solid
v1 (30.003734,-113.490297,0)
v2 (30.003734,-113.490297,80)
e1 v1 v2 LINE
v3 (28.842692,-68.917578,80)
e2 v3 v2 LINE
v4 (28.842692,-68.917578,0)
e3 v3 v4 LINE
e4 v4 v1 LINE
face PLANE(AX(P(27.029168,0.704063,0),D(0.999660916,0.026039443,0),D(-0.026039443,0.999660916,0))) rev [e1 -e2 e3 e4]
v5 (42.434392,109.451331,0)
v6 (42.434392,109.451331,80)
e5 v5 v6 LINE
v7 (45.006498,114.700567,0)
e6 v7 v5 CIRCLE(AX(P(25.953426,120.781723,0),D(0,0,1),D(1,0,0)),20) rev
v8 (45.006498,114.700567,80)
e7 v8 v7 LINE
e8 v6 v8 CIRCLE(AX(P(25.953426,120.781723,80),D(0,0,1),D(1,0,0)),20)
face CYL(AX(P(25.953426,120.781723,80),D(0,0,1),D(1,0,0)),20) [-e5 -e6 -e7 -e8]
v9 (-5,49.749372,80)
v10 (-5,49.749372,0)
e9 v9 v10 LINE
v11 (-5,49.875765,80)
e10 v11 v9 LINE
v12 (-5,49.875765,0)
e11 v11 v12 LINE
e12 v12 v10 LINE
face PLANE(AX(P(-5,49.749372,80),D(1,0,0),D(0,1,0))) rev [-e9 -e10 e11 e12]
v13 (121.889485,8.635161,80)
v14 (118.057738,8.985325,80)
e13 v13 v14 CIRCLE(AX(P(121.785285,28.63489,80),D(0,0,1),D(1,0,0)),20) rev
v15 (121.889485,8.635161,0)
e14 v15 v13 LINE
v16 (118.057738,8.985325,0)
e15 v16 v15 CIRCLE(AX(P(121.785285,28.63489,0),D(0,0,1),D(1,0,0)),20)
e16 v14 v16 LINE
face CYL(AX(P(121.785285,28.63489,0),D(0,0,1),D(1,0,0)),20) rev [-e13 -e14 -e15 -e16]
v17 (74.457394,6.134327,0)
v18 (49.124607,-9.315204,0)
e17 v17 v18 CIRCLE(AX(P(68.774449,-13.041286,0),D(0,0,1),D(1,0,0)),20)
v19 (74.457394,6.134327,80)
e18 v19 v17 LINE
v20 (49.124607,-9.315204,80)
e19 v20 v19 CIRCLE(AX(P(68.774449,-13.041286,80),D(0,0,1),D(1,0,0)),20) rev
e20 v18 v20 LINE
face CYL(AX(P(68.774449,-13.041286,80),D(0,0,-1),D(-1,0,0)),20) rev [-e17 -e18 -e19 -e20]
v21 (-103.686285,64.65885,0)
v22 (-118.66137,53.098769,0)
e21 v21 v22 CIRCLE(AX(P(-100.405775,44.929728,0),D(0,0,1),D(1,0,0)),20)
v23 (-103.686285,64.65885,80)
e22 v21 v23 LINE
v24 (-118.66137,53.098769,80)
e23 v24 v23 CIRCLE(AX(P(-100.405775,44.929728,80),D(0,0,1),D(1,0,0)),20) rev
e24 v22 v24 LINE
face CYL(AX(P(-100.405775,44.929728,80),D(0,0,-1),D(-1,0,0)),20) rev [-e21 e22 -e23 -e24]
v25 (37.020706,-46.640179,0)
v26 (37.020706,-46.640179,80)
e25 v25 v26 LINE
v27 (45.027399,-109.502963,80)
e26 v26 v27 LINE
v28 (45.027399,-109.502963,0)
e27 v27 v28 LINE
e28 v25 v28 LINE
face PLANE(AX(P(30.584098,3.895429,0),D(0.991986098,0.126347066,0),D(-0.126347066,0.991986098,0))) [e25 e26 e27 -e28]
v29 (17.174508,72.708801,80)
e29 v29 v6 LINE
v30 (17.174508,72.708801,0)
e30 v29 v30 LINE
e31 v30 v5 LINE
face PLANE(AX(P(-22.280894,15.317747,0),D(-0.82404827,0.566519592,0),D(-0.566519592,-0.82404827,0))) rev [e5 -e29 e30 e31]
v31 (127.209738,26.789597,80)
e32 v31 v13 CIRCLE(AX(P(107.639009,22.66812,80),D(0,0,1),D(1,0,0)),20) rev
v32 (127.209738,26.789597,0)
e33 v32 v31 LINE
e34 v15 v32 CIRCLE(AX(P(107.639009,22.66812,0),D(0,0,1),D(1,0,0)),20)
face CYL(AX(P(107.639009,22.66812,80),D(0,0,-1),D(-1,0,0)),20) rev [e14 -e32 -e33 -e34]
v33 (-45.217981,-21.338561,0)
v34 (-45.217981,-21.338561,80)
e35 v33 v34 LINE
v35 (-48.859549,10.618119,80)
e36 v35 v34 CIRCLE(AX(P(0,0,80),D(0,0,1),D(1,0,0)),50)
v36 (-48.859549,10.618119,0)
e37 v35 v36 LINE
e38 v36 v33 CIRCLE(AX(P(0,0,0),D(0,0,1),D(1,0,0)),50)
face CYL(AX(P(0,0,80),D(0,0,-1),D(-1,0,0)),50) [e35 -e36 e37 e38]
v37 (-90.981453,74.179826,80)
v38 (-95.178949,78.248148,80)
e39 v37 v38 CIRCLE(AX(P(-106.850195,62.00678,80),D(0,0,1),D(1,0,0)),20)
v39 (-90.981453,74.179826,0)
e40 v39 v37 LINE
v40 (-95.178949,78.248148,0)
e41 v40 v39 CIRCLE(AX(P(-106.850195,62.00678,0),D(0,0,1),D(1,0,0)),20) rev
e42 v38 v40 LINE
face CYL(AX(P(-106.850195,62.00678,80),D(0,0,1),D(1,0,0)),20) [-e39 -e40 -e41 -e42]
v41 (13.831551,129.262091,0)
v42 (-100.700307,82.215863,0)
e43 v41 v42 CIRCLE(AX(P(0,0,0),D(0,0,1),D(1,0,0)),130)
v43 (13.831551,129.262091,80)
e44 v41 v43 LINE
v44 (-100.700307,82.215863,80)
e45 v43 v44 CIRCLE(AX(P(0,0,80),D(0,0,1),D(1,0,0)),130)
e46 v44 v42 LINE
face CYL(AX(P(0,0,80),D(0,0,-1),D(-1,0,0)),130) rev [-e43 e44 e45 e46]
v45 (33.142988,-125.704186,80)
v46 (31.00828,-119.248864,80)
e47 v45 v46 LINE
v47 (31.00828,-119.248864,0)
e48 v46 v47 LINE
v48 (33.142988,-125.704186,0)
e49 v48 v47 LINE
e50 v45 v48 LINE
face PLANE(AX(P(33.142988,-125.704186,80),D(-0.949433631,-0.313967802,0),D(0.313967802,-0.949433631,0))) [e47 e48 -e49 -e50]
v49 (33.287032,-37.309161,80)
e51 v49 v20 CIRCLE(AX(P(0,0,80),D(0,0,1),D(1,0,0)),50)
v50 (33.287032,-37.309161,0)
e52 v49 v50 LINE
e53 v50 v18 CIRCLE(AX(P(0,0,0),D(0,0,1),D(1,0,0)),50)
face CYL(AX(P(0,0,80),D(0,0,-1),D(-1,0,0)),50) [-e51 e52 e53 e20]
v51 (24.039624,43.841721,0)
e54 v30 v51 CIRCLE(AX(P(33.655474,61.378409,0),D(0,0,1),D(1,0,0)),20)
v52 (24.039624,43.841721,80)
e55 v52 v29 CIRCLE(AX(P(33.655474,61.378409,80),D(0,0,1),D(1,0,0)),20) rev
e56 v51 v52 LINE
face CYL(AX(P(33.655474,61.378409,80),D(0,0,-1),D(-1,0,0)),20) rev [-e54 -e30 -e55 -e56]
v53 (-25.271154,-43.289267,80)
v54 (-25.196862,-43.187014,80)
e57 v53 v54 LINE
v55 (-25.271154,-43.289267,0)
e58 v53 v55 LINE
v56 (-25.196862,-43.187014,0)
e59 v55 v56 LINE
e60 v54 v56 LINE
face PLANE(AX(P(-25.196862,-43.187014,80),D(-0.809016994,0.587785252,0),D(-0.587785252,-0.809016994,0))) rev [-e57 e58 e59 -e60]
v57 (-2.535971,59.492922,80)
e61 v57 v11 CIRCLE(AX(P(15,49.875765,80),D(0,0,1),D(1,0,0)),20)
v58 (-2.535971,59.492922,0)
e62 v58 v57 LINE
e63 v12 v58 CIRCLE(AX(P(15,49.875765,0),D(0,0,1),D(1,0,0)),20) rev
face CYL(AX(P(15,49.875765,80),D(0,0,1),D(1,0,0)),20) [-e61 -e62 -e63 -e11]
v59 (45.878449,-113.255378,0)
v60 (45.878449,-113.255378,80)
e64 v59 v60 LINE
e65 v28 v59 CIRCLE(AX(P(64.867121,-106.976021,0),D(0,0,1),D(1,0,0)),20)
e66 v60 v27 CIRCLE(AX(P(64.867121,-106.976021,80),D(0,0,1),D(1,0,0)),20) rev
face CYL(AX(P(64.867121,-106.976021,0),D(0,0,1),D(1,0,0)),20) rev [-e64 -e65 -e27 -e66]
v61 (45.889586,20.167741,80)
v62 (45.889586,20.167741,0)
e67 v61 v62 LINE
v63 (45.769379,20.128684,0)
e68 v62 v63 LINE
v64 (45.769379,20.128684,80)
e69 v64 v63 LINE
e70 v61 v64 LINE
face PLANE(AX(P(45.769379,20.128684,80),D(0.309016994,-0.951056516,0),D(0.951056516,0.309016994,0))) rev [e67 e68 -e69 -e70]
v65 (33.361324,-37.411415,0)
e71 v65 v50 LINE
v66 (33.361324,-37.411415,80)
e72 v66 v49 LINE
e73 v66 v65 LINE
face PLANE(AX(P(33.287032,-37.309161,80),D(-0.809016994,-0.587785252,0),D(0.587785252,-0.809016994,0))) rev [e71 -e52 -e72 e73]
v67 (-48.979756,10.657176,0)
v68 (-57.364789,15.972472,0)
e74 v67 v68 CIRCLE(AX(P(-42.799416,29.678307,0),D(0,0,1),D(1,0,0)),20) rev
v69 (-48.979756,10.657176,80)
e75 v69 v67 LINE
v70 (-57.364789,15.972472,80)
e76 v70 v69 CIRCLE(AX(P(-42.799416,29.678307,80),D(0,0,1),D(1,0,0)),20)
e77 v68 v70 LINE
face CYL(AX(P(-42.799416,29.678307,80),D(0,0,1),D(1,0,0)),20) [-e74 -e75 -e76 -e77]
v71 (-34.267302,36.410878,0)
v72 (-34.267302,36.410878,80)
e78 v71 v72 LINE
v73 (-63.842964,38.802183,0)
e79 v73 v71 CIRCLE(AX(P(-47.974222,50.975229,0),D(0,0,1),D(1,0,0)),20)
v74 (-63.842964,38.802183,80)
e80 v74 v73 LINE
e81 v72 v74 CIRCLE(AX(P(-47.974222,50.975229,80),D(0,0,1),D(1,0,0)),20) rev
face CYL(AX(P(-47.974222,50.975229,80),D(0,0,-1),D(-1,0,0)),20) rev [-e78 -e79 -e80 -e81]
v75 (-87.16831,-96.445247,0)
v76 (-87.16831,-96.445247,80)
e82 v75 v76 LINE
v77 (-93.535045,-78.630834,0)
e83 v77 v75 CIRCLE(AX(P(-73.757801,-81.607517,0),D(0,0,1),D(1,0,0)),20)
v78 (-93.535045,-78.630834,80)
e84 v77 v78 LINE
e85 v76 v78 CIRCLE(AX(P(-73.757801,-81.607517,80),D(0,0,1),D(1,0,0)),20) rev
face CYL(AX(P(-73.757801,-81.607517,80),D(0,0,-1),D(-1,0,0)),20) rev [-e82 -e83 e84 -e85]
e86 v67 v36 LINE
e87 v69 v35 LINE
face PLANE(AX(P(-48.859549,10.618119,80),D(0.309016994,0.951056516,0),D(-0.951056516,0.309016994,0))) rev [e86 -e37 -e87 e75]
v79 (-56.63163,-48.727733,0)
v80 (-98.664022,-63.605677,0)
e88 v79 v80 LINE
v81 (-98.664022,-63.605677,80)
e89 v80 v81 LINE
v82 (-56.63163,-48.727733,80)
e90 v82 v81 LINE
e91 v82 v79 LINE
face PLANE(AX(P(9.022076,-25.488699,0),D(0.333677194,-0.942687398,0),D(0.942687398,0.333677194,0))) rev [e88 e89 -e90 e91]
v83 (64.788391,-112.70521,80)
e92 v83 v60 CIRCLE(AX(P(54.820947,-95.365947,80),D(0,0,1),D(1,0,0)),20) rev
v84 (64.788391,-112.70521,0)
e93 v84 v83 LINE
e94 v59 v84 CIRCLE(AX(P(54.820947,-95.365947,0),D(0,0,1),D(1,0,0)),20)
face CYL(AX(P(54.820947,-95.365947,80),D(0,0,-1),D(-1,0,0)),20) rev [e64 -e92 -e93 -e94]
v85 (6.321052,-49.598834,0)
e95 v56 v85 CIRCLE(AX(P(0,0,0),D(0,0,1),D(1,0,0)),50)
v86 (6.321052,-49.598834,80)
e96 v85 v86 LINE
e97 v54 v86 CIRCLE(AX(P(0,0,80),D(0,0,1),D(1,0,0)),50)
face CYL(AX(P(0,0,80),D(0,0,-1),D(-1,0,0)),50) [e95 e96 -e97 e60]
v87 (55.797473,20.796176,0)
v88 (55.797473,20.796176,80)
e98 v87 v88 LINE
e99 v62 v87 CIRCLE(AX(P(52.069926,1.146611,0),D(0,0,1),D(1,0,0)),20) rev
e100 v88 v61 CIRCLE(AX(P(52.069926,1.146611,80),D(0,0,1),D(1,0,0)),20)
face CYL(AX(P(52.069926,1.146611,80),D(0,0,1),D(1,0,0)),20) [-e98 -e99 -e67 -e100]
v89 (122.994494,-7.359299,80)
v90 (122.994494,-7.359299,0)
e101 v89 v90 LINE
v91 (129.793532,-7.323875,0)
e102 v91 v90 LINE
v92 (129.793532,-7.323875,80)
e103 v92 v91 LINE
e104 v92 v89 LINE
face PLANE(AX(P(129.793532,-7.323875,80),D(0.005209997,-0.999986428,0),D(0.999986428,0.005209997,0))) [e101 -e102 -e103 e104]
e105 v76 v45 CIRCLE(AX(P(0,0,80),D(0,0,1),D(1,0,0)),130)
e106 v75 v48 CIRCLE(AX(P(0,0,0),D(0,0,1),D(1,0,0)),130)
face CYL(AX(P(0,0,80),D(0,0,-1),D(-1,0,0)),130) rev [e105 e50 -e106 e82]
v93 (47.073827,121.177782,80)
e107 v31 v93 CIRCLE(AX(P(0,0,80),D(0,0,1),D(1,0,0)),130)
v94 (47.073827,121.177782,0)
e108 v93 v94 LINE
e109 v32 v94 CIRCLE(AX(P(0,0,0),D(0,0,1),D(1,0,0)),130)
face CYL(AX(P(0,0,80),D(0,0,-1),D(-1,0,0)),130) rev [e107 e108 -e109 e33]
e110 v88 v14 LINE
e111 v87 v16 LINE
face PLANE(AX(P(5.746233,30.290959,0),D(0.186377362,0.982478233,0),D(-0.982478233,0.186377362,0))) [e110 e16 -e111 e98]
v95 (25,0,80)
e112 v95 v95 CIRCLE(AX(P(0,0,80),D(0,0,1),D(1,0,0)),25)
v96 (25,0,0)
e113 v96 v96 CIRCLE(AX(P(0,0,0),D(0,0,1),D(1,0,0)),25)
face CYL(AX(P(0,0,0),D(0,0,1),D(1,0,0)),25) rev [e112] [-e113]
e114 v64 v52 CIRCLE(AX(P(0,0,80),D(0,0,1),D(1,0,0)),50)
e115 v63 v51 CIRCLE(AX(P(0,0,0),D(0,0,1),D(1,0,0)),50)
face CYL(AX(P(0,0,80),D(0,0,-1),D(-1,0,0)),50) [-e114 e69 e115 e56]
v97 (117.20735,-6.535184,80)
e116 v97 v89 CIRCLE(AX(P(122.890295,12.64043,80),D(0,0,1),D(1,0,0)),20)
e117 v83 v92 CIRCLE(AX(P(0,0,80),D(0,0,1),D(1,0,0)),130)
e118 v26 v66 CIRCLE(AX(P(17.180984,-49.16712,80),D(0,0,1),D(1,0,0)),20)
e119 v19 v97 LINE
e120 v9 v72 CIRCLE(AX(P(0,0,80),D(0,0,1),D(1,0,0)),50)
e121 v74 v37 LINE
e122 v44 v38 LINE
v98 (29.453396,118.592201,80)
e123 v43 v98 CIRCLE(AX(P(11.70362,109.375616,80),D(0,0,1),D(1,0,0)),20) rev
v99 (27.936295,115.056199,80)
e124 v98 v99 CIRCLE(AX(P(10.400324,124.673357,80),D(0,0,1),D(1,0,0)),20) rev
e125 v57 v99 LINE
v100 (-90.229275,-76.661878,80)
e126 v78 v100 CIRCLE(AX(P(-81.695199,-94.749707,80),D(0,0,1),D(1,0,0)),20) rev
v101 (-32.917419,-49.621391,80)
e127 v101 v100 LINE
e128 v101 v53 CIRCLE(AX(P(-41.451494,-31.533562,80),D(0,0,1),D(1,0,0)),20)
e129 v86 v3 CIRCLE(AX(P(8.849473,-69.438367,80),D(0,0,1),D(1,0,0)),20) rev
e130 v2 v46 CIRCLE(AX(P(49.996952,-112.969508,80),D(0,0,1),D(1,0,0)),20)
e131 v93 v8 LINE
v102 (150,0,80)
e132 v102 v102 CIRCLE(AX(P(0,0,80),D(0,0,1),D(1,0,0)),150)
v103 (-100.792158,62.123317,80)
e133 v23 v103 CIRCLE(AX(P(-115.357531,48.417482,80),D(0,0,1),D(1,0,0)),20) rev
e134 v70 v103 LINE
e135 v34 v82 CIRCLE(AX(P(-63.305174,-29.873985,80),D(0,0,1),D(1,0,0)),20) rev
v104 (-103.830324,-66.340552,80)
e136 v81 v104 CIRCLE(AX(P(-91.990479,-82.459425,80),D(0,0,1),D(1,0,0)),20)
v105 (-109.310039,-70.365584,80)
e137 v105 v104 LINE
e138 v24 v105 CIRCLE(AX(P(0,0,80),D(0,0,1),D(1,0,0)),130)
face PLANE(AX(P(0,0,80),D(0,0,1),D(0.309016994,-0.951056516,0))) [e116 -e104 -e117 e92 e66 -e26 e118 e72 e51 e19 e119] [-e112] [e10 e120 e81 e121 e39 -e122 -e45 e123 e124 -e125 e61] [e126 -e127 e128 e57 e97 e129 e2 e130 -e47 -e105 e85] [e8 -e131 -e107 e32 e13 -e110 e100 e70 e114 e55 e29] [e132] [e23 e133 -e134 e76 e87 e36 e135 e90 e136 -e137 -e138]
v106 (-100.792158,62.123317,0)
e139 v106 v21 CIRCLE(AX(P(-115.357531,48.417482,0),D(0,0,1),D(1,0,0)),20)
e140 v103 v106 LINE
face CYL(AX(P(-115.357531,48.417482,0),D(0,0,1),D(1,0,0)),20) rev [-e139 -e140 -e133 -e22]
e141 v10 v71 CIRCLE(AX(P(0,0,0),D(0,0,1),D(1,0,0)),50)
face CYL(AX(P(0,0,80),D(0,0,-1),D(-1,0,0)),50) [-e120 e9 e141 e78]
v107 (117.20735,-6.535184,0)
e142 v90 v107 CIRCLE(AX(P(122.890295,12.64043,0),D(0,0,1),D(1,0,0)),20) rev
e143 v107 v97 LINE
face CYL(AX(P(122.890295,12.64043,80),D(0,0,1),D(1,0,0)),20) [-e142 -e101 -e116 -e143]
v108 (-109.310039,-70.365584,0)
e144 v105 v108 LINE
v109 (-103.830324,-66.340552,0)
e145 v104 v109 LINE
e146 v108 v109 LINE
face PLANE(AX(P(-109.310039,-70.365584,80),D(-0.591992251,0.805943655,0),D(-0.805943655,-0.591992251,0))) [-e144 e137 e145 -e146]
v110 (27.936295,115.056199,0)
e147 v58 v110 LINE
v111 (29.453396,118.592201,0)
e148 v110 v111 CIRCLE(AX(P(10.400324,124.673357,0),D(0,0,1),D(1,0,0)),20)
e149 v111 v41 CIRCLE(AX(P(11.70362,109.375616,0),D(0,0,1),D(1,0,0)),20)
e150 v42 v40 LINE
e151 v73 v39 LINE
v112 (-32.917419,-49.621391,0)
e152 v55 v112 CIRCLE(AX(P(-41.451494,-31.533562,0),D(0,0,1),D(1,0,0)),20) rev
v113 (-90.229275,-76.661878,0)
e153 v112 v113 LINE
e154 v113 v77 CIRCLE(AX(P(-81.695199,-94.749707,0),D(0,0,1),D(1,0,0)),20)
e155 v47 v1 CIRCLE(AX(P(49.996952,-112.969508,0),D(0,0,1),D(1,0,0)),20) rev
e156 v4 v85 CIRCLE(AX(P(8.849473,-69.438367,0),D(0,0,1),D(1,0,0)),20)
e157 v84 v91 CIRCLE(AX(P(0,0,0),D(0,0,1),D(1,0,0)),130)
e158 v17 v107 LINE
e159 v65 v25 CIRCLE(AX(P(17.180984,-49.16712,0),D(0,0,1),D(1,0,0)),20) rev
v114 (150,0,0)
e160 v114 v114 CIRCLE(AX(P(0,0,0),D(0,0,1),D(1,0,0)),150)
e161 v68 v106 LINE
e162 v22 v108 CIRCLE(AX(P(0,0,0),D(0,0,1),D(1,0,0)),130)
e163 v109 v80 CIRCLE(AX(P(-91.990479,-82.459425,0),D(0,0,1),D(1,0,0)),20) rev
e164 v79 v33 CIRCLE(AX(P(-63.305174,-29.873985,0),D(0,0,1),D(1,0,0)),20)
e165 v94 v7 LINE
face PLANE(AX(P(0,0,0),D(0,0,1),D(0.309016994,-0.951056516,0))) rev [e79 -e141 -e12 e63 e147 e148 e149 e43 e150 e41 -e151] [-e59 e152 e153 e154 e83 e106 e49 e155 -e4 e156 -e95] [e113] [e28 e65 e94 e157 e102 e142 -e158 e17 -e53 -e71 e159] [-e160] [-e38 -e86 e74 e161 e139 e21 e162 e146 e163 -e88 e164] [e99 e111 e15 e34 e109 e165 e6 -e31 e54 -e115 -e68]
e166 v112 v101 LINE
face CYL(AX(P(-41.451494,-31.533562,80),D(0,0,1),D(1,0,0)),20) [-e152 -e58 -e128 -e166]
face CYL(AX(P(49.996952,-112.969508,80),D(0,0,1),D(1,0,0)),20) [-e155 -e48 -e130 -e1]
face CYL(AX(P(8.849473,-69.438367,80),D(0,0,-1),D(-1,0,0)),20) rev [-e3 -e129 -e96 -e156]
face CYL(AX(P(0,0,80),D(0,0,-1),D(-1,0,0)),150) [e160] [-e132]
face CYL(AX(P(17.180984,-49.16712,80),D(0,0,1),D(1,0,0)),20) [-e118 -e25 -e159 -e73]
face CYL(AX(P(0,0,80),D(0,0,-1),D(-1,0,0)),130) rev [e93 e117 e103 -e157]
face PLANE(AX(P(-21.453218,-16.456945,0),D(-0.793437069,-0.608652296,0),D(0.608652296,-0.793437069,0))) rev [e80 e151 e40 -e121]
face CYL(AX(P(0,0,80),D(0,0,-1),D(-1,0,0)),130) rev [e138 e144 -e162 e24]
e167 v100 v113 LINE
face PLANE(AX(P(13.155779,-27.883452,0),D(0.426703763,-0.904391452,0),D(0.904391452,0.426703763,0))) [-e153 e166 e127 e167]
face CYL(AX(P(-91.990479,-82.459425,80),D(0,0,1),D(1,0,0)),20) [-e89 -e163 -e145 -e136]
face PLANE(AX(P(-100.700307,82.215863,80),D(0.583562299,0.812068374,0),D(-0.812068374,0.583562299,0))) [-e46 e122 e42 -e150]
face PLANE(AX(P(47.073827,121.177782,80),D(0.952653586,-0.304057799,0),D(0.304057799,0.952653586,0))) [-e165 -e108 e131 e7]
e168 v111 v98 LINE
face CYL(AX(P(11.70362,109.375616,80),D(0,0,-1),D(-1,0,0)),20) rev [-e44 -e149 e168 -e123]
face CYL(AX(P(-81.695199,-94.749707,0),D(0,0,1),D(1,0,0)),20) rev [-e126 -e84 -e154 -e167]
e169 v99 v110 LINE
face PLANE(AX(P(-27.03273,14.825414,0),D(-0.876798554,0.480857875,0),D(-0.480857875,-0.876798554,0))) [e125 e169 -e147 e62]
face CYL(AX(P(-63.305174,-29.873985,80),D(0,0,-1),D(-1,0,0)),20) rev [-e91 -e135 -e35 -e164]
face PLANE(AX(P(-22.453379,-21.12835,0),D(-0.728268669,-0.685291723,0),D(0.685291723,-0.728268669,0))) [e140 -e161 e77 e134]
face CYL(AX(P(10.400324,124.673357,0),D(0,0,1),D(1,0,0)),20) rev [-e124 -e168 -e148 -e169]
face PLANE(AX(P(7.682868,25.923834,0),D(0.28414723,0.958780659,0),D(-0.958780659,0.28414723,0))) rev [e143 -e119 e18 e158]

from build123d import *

# Parameters (mm, degrees)
SKETCH1_R           = 150
BOSS_EXTRUDE1_DEPTH = 80
BOSS_EXTRUDE2_DEPTH = 80
LOFT1_DEPTH         = 80
CIRPATTERN1_COUNT   = 5
FILLET1_R           = 20
FILLET2_R           = 20
FILLET3_R           = 20
SKETCH3_R           = 25
CUT_EXTRUDE1_DEPTH  = 80


with BuildPart() as part:
    # Sketch1 → Boss-Extrude1 (new body)
    with BuildSketch(Plane.XY):
        Circle(SKETCH1_R)
        with BuildLine():
            Line((129.710171657, 8.675907367), (119.956691368, 8.625091073))
            Line((119.956691368, 8.625091073), (120.040051321, -7.374691773))
            Line((120.040051321, -7.374691773), (129.793531611, -7.323875479))
            ThreePointArc((129.793531611, -7.323875479), (105.568888587, -75.86309882), (48.333925621, -120.680701166))
            Line((48.333925621, -120.680701166), (45.271605291, -111.420293279))
            Line((45.271605291, -111.420293279), (30.080667198, -116.443778112))
            Line((30.080667198, -116.443778112), (33.142987529, -125.704185999))
            ThreePointArc((33.142987529, -125.704185999), (-39.527513828, -123.84496619), (-99.838162814, -83.260682474))
            Line((-99.838162814, -83.260682474), (-91.977300573, -77.486619356))
            Line((-91.977300573, -77.486619356), (-101.449176589, -64.591520879))
            Line((-101.449176589, -64.591520879), (-109.310038829, -70.365583996))
            ThreePointArc((-109.310038829, -70.365583996), (-129.998235624, -0.677299621), (-110.037303615, 69.222769471))
            Line((-110.037303615, 69.222769471), (-102.116703238, 63.530928844))
            Line((-102.116703238, 63.530928844), (-92.779706461, 76.524022824))
            Line((-92.779706461, 76.524022824), (-100.700306837, 82.215863451))
            ThreePointArc((-100.700306837, 82.215863451), (-40.815814265, 123.426372003), (31.831369149, 126.042706802))
            Line((31.831369149, 126.042706802), (28.865707153, 116.750892719))
            Line((28.865707153, 116.750892719), (44.10816453, 111.88596794))
            Line((44.10816453, 111.88596794), (47.073826527, 121.177782024))
            ThreePointArc((47.073826527, 121.177782024), (104.772675129, 76.958992627), (129.710171657, 8.675907367))
        make_face(mode=Mode.SUBTRACT)
    extrude(amount=BOSS_EXTRUDE1_DEPTH)


with BuildPart() as body_2:
    # Sketch2 → Boss-Extrude2 (new body)
    with BuildSketch(Plane.XY):
        with BuildLine():
            Line((-5, 55), (5, 55))
            Line((5, 55), (5, 49.749371855))
            ThreePointArc((5, 49.749371855), (29.389262615, 40.450849719), (45.769379313, 20.128683944))
            Line((45.769379313, 20.128683944), (50.763023424, 21.751217272))
            Line((50.763023424, 21.751217272), (53.853193368, 12.240652109))
            Line((53.853193368, 12.240652109), (48.859549256, 10.618118781))
            ThreePointArc((48.859549256, 10.618118781), (47.552825815, -15.450849719), (33.287032059, -37.309161029))
            Line((33.287032059, -37.309161029), (36.373273848, -41.557008429))
            Line((36.373273848, -41.557008429), (28.283103904, -47.434860952))
            Line((28.283103904, -47.434860952), (25.196862116, -43.187013552))
            ThreePointArc((25.196862116, -43.187013552), (0, -50), (-25.196862116, -43.187013552))
            Line((-25.196862116, -43.187013552), (-28.283103904, -47.434860952))
            Line((-28.283103904, -47.434860952), (-36.373273848, -41.557008429))
            Line((-36.373273848, -41.557008429), (-33.287032059, -37.309161029))
            ThreePointArc((-33.287032059, -37.309161029), (-47.552825815, -15.450849719), (-48.859549256, 10.618118781))
            Line((-48.859549256, 10.618118781), (-53.853193368, 12.240652109))
            Line((-53.853193368, 12.240652109), (-50.763023424, 21.751217272))
            Line((-50.763023424, 21.751217272), (-45.769379313, 20.128683944))
            ThreePointArc((-45.769379313, 20.128683944), (-29.389262615, 40.450849719), (-5, 49.749371855))
            Line((-5, 49.749371855), (-5, 55))
        make_face()
    extrude(amount=BOSS_EXTRUDE2_DEPTH)


with BuildPart() as body_3:
    # Loft1: read off the stored shape, not the designer's step
    # Loft1 outline → Loft1 (new body)
    with BuildSketch(Plane.XY):
        Polygon((44.10816453, 111.88596794), (28.865707153, 116.750892719), (-5, 55), (5, 55), align=None)
    extrude(amount=LOFT1_DEPTH)


with BuildPart() as cirpattern1_1:
    # CirPattern1: pattern copy
    add(body_3.part.rotate(Axis((0, 0, 0), (0, 0, 1)), 1 * 360 / CIRPATTERN1_COUNT))


with BuildPart() as cirpattern1_2:
    # CirPattern1: pattern copy
    add(body_3.part.rotate(Axis((0, 0, 0), (0, 0, 1)), 2 * 360 / CIRPATTERN1_COUNT))


with BuildPart() as cirpattern1_3:
    # CirPattern1: pattern copy
    add(body_3.part.rotate(Axis((0, 0, 0), (0, 0, 1)), 3 * 360 / CIRPATTERN1_COUNT))


with BuildPart() as cirpattern1_4:
    # CirPattern1: pattern copy
    add(body_3.part.rotate(Axis((0, 0, 0), (0, 0, 1)), 4 * 360 / CIRPATTERN1_COUNT))

    # Combine1: union body 2, part, body 3, CirPattern1_1, CirPattern1_2, CirPattern1_3
    add(body_2.part)
    add(part.part)
    add(body_3.part)
    add(cirpattern1_1.part)
    add(cirpattern1_2.part)
    add(cirpattern1_3.part)

    # Fillet1
    # the kernel refuses this fillet: 20 mm, written as the material it adds along each edge
    with BuildSketch(Plane(origin=(-91.977300573, -77.486619356, 0), x_dir=(-0.8059436548419507, -0.5919922509796886, 0), z_dir=(0, 0, 1)), Plane(origin=(45.271605291, -111.420293279, 0), x_dir=(0.31396780203564834, -0.9494336307951725, 0), z_dir=(0, 0, 1)), Plane(origin=(-102.116703238, 63.530928844, 0), x_dir=(-0.8120683737452884, 0.5835622986131666, 0), z_dir=(0, 0, 1))) as fillet1_piece_1:
        with BuildLine():
            CenterArc((FILLET1_R * 0.0966409957188, FILLET1_R), FILLET1_R, 258.96004162, 11.03995838)
            Line((-FILLET1_R * 0.0948525451909, FILLET1_R * 0.0185061264634), (0, 0))
            Line((0, 0), (FILLET1_R * 0.0966409957188, 0))
        make_face()
    extrude(amount=80)
    with BuildSketch(Plane(origin=(119.956691369, 8.625091073, 0), x_dir=(-0.9824782333673042, 0.1863773617139722, 0), z_dir=(0, 0, 1))) as fillet1_piece_2:
        with BuildLine():
            CenterArc((FILLET1_R * 0.0966409957054, -FILLET1_R), FILLET1_R, 90, 11.03995838)
            Line((-FILLET1_R * 0.0948525452044, -FILLET1_R * 0.0185061264634), (0, 0))
            Line((0, 0), (FILLET1_R * 0.0966409957054, 0))
        make_face()
    extrude(amount=80)
    with BuildSketch(Plane(origin=(28.865707153, 116.750892719, 0), x_dir=(-0.4808578750966385, -0.8767985538067142, 0), z_dir=(0, 0, 1))) as fillet1_piece_3:
        with BuildLine():
            CenterArc((FILLET1_R * 0.0966409957188, -FILLET1_R), FILLET1_R, 90.000000002, 11.03995838)
            Line((-FILLET1_R * 0.0948525452298, -FILLET1_R * 0.018506126471), (0, 0))
            Line((0, 0), (FILLET1_R * 0.0966409956792, 0))
        make_face()
    extrude(amount=80)
    with BuildSketch(Plane(origin=(-36.373273848, -41.557008429, 0), x_dir=(-0.9426873980194184, -0.33367719372977617, 0), z_dir=(0, 0, 1)), Plane(origin=(28.283103904, -47.434860952, 0), x_dir=(0.026039443064681988, -0.9996609162135335, 0), z_dir=(0, 0, 1)), Plane(origin=(53.853193368, 12.240652109, 0), x_dir=(0.9587806588816111, -0.28414722971470946, 0), z_dir=(0, 0, 1)), Plane(origin=(5, 55, 0), x_dir=(0.5665195918801321, 0.8240482704404934, 0), z_dir=(0, 0, 1)), Plane(origin=(-50.763023424, 21.751217272, 0), x_dir=(-0.6086522958068845, 0.7934370692178484, 0), z_dir=(0, 0, 1))) as fillet1_piece_4:
        with BuildLine():
            CenterArc((6.167760881, -20), FILLET1_R, 90, 31.649839664)
            Line((-4.326771041, -2.974583714), (0, 0))
            Line((0, 0), (6.167760881, 0))
        make_face()
    extrude(amount=80)
    # the kernel refuses this fillet: 20 mm, written as the material it takes off along each edge
    with BuildSketch(Plane(origin=(-101.449176589, -64.591520879, -7.386208111), x_dir=(0.9426873980435565, 0.33367719366158266, 0), z_dir=(0, 0, 1)), Plane(origin=(30.080667198, -116.443778112, -7.386208111), x_dir=(-0.026039442992376174, 0.9996609162154169, 0), z_dir=(0, 0, 1)), Plane(origin=(44.10816453, 111.88596794, -7.386208111), x_dir=(-0.566519591939725, -0.8240482703995243, 0), z_dir=(0, 0, 1)), Plane(origin=(-92.779706461, 76.524022824, -7.386208111), x_dir=(0.6086522957494933, -0.7934370692618736, 0), z_dir=(0, 0, 1))) as fillet1_2_piece_1:
        with BuildLine():
            CenterArc((FILLET1_R * 0.147724162219, -FILLET1_R), FILLET1_R, 90.000000004, 16.806393351)
            Line((-FILLET1_R * 0.141414455522, -FILLET1_R * 0.042712760071), (0, 0))
            Line((0, 0), (FILLET1_R * 0.147724162147, 0))
        make_face()
    extrude(amount=94.772416222, mode=Mode.SUBTRACT)
    with BuildSketch(Plane(origin=(120.040051322, -7.374691773, -7.38620811), x_dir=(-0.9587806588816119, 0.2841472297147065, 0), z_dir=(0, 0, 1))) as fillet1_2_piece_2:
        with BuildLine():
            CenterArc((FILLET1_R * 0.14772416216, -FILLET1_R), FILLET1_R, 90, 16.806393351)
            Line((-FILLET1_R * 0.141414455511, -FILLET1_R * 0.04271276005), (0, 0))
            Line((0, 0), (FILLET1_R * 0.14772416216, 0))
        make_face()
    extrude(amount=94.77241622, mode=Mode.SUBTRACT)
    with BuildSketch(Plane(origin=(-28.283103904, -47.434860952, -12.810588384), x_dir=(-0.9043914519746539, -0.426703763277496, 0), z_dir=(0, 0, 1)), Plane(origin=(36.373273848, -41.557008429, -12.810588384), x_dir=(0.12634706636512016, -0.9919860980986216, 0), z_dir=(0, 0, 1)), Plane(origin=(50.763023424, 21.751217272, -12.810588384), x_dir=(0.9824782333673043, -0.18637736171397165, 0), z_dir=(0, 0, 1)), Plane(origin=(-53.853193368, 12.240652109, -12.810588384), x_dir=(-0.6852917228203294, 0.7282686692656392, 0), z_dir=(0, 0, 1))) as fillet1_2_piece_3:
        with BuildLine():
            CenterArc((FILLET1_R * 0.256211767685, -FILLET1_R), FILLET1_R, 90, 28.741446185)
            Line((-FILLET1_R * 0.224646107378, -FILLET1_R * 0.123201446175), (0, 0))
            Line((0, 0), (FILLET1_R * 0.256211767684, 0))
        make_face()
    extrude(amount=105.621176768, mode=Mode.SUBTRACT)
    with BuildSketch(Plane(origin=(-5, 55, -12.810588384), x_dir=(0, -1, 0), z_dir=(0, 0, 1))) as fillet1_2_piece_4:
        with BuildLine():
            CenterArc((FILLET1_R * 0.256211767684, FILLET1_R), FILLET1_R, 241.258553815, 28.741446185)
            Line((-FILLET1_R * 0.224646107378, FILLET1_R * 0.123201446174), (0, 0))
            Line((0, 0), (FILLET1_R * 0.256211767684, 0))
        make_face()
    extrude(amount=105.621176768, mode=Mode.SUBTRACT)

    # Fillet2
    fillet2_edges = [cirpattern1_4.edges().sort_by_distance(p)[0] for p in [
        (-45.769379313, 20.128683944, 40),
        (5, 49.749371855, 40),
        (48.859549256, 10.618118781, 40),
        (25.196862116, -43.187013552, 40),
        (-33.287032059, -37.309161029, 40),
    ]]
    fillet(fillet2_edges, radius=FILLET2_R - 0.0001)  # a hair under: the kernel refuses the full size

    # Fillet3
    # the kernel refuses this fillet: 20 mm, written as the material it adds along each edge
    with BuildSketch(Plane(origin=(-99.838162814, -83.260682474, 0), x_dir=(0.6928923413155604, -0.7210410552432093, 0), z_dir=(0, 0, 1)), Plane(origin=(48.333925621, -120.680701166, 0), x_dir=(0.899866302844142, 0.43616583658697394, 0), z_dir=(0, 0, 1)), Plane(origin=(129.710171657, 8.675907367, 0), x_dir=(-0.1367443808271708, 0.9906063669854912, 0), z_dir=(0, 0, 1)), Plane(origin=(31.831369149, 126.042706802, 0), x_dir=(-0.9843789779658949, 0.17606256768211787, 0), z_dir=(0, 0, 1)), Plane(origin=(-110.037303615, 69.222769471, 0), x_dir=(-0.4716352853666361, -0.881793716011365, 0), z_dir=(0, 0, 1))) as fillet3_piece_1:
        with BuildLine():
            CenterArc((16.878882523, 19.95047746), FILLET3_R, 217.581129198, 56.451736362)
            Line((1.029071396, 7.752793776), (0.712075174, 7.508840102))
            ThreePointArc((0.712075174, 7.508840102), (0.118013554, 3.929029475), (-0.396522144, 0.052632587))
            Line((-0.396522144, 0.052632587), (-0.028131471, -0.399009549))
            ThreePointArc((-0.028131471, -0.399009549), (9.142728033, -0.721896513), (18.313587537, -0.399009549))
            Line((18.313587537, -0.399009549), (18.285456067, 0))
        make_face()
    extrude(amount=80)

    # Sketch3 → Cut-Extrude1 (cut)
    with BuildSketch(Plane.XY.offset(80)):
        Circle(SKETCH3_R)
    extrude(amount=-CUT_EXTRUDE1_DEPTH, mode=Mode.SUBTRACT)


solid = cirpattern1_4.part
